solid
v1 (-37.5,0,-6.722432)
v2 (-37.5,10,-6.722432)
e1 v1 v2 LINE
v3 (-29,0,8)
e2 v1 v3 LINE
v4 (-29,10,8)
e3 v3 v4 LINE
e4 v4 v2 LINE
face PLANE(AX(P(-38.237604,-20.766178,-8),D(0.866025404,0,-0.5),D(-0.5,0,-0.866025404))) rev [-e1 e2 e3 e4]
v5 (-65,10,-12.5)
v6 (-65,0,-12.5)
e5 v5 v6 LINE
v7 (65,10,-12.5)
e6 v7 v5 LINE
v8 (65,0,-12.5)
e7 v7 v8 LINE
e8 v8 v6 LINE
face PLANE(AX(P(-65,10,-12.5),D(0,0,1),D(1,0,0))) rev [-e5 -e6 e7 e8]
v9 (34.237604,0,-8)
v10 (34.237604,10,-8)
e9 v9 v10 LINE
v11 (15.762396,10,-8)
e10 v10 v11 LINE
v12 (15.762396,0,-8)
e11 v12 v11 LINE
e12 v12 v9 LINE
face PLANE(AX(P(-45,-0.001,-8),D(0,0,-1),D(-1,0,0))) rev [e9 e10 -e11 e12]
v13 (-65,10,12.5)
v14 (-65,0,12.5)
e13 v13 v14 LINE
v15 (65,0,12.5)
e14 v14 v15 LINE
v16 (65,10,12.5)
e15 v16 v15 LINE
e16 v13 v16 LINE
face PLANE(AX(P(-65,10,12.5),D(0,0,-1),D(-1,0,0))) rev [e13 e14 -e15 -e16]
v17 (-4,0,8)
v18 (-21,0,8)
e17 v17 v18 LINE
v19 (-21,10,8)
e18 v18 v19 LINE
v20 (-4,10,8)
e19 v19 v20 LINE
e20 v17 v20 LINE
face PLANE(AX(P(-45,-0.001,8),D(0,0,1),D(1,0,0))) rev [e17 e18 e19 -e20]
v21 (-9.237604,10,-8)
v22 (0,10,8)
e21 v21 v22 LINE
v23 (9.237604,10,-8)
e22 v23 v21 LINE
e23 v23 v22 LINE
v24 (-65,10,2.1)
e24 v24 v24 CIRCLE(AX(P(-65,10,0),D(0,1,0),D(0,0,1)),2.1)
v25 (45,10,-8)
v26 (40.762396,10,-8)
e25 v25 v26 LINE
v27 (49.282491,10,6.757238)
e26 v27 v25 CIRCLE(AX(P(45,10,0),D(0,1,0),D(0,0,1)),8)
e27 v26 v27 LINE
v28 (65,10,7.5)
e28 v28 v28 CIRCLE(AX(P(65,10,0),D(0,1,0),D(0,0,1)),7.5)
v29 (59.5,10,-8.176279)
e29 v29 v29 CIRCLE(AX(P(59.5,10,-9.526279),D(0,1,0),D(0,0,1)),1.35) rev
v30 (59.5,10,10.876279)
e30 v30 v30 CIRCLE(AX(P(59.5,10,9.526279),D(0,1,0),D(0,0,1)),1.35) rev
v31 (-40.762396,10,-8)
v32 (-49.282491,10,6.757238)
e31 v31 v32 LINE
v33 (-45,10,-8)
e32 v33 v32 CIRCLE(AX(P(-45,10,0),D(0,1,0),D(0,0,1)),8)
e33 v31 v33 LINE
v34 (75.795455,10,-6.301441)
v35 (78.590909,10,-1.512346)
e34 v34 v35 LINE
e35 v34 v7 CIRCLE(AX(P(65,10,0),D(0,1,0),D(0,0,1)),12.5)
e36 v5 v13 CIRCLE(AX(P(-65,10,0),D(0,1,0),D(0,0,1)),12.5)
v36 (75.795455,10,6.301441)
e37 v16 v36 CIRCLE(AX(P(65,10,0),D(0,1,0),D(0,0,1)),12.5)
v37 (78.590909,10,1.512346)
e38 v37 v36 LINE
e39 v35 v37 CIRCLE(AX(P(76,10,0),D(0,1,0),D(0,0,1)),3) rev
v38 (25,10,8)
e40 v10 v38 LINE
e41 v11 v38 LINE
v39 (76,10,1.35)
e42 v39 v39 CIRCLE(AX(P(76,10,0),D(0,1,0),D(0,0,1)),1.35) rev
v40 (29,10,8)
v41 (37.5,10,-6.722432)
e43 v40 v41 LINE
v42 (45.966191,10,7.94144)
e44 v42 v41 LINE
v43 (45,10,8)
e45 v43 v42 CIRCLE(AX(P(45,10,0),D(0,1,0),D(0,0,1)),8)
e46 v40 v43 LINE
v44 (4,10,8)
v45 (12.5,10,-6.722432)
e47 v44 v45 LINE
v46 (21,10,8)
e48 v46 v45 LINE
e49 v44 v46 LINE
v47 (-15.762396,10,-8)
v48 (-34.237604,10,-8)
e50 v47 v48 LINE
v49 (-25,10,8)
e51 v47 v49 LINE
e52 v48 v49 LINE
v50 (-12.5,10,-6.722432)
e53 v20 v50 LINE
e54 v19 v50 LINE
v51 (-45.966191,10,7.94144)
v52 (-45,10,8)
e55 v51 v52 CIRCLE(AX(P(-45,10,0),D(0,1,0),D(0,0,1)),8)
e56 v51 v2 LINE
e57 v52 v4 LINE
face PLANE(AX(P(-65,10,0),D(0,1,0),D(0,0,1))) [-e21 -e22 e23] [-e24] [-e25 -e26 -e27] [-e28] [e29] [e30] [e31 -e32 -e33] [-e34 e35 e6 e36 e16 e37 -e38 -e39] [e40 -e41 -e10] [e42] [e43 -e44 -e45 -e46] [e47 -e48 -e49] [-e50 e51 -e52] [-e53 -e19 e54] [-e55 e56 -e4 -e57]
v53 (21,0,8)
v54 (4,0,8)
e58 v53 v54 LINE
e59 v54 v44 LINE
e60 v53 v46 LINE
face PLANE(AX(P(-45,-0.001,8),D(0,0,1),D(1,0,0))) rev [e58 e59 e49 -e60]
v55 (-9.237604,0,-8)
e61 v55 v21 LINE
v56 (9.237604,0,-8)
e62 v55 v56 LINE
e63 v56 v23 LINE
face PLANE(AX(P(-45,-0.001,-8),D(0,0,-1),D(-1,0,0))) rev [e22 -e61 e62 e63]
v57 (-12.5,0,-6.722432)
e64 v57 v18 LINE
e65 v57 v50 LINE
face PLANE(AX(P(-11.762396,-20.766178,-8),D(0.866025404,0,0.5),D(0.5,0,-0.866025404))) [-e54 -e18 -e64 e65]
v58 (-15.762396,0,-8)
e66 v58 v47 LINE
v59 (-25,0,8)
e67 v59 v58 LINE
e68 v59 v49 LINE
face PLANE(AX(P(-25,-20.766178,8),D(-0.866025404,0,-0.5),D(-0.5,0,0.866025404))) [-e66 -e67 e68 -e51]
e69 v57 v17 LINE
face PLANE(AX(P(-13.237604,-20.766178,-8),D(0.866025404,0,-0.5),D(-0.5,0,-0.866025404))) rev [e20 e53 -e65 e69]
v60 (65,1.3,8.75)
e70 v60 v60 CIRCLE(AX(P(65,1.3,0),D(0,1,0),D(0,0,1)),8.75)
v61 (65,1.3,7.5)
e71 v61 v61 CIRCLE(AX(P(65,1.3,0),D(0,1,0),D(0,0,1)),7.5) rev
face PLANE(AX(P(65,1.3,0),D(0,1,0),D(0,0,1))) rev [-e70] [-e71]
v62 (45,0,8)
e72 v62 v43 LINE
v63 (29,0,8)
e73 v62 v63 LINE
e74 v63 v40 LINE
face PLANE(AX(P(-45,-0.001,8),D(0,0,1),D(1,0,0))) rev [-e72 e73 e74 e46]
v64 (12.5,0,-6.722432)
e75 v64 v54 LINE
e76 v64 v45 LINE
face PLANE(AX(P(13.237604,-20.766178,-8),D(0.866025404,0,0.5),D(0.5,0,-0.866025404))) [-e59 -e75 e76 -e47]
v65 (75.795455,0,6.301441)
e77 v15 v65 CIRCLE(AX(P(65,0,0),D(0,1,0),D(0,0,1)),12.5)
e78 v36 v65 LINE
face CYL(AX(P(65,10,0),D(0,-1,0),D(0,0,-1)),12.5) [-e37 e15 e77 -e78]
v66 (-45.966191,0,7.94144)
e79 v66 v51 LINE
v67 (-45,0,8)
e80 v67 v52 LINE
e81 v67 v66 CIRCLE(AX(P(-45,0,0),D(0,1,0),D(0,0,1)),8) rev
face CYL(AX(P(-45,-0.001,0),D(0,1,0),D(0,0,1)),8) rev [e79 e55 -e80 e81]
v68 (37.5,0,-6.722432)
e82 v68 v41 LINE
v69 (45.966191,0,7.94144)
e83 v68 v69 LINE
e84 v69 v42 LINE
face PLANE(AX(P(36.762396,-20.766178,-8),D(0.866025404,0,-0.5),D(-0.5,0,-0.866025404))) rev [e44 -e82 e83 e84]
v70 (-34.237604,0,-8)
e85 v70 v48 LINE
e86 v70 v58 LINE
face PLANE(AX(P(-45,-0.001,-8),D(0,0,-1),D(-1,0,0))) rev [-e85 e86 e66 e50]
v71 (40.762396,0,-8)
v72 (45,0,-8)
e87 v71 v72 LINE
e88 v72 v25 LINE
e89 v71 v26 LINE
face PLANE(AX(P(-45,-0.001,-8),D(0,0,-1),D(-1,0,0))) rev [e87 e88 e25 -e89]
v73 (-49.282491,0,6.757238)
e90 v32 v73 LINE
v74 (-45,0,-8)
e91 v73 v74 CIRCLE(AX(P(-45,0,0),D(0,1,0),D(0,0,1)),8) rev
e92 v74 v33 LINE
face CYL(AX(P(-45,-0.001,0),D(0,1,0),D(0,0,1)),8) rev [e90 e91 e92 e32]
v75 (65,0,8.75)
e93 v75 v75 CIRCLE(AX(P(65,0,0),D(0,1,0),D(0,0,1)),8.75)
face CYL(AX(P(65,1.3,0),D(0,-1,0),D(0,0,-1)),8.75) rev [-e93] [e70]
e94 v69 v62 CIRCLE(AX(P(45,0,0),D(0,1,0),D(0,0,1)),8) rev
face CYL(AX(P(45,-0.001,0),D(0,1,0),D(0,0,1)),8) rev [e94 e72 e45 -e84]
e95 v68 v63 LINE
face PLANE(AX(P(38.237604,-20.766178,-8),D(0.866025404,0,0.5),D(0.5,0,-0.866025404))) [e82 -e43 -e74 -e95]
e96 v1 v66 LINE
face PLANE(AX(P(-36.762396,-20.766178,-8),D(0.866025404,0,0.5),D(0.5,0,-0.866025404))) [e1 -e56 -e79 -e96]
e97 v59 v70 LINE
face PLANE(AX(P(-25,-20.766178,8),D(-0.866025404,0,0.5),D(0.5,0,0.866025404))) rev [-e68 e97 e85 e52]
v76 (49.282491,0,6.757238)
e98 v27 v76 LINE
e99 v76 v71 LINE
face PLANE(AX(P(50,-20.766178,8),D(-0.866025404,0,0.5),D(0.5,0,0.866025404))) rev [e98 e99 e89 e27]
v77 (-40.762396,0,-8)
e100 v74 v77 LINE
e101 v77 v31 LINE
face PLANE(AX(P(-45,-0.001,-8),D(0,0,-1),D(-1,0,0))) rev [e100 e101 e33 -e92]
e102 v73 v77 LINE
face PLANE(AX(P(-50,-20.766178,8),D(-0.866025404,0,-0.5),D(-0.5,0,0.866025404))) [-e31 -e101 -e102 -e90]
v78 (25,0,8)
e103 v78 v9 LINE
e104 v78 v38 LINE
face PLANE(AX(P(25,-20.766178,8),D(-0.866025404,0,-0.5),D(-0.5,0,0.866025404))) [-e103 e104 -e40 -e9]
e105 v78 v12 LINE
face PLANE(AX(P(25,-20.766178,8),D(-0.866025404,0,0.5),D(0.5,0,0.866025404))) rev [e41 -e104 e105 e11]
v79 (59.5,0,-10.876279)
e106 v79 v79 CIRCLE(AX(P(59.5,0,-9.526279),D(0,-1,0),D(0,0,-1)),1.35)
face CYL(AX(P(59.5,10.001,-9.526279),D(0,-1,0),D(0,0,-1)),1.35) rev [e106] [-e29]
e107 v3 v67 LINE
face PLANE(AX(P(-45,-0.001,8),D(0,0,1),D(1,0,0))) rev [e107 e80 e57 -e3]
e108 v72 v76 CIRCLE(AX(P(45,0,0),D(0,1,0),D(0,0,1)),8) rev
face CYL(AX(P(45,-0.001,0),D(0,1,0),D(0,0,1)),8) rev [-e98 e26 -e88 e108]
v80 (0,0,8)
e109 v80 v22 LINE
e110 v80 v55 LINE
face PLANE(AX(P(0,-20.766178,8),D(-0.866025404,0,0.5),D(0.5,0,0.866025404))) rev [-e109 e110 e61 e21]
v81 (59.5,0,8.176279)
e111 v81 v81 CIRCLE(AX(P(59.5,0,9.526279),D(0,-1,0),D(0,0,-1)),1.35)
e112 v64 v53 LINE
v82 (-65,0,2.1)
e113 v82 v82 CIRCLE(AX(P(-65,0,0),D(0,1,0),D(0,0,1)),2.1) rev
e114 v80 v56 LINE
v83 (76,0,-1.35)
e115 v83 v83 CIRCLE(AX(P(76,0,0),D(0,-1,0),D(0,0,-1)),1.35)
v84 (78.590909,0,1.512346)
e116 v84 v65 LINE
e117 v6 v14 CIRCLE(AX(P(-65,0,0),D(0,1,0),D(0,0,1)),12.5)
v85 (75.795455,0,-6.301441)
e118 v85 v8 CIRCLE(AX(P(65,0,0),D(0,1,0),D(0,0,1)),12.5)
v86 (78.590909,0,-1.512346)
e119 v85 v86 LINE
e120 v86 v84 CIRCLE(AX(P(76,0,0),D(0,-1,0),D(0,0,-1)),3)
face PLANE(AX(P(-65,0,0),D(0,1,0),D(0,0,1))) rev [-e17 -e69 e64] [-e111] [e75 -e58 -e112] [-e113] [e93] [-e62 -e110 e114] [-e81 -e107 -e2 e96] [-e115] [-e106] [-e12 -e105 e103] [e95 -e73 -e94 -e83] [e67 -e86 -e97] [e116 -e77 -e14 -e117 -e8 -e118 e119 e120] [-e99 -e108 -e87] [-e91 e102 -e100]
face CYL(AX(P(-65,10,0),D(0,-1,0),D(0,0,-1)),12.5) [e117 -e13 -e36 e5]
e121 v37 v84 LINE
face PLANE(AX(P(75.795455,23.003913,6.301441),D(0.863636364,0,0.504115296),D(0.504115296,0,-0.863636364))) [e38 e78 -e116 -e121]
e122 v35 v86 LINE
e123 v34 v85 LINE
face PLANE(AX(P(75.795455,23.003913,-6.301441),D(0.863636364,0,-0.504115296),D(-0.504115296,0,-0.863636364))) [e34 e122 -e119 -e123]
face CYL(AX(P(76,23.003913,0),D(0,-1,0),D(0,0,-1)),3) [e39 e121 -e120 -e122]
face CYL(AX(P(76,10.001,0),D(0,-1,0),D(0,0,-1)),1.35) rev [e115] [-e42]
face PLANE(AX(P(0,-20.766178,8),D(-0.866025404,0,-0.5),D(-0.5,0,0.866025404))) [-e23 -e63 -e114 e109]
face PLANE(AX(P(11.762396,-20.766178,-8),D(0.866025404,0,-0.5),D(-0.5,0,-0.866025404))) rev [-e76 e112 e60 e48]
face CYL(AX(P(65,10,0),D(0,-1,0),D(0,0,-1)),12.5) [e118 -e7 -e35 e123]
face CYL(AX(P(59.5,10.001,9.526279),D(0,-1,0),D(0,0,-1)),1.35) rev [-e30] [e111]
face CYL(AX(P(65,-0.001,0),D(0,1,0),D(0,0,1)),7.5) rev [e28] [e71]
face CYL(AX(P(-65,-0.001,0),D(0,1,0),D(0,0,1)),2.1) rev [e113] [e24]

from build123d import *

# Parameters (mm, degrees)
EXTRUDE_1_DEPTH        = 10
EXTRUDE_5_DEPTH        = 10
CUT_EXTRUDE_2_REACH    = 82.606
SKETCH_7_R             = 7.5
SKETCH_8_R             = 8.75
CUT_EXTRUDE_3_DEPTH    = 1.3
CUT_EXTRUDE_4_REACH    = 82.606
SKETCH_9_R             = 1.35
CUT_EXTRUDE_5_REACH    = 82.606
SKETCH_12_R            = 2.1
CUT_EXTRUDE_6_REACH    = 82.606
EXTRUDE_6_DEPTH        = 10
PATTERN_LINEAR_1_DEPTH = 10


# Read off the part's stored shape, not the designer's step: 阵列(线性)1
with BuildPart() as part:
    # 草图1 → 凸台-拉伸1 (new body)
    with BuildSketch(Plane(origin=(0, 0, 0), x_dir=(1, 0, 0), z_dir=(0, 1, 0))):
        with BuildLine():
            Line((-65, 12.5), (65, 12.5))
            ThreePointArc((65, 12.5), (77.5, 0), (65, -12.5))
            Line((65, -12.5), (-65, -12.5))
            ThreePointArc((-65, -12.5), (-77.5, 0), (-65, 12.5))
        make_face()
    extrude(amount=EXTRUDE_1_DEPTH)

    # 草图10 → 凸台-拉伸5 (add)
    with BuildSketch(Plane.XZ):
        with BuildLine():
            Line((75.795454545, -6.301441197), (78.590909091, -1.512345887))
            ThreePointArc((78.590909091, -1.512345887), (79, 0), (78.590909091, 1.512345887))
            Line((78.590909091, 1.512345887), (75.795454545, 6.301441197))
            Line((75.795454545, 6.301441197), (75.795454545, -6.301441197))
        make_face()
    extrude(amount=-EXTRUDE_5_DEPTH)

    # 草图7 → 切除-拉伸2 (cut, up to next)
    with BuildSketch(Plane(origin=(0, 10, 0), x_dir=(1, 0, 0), z_dir=(0, 1, 0)), mode=Mode.PRIVATE) as cut_extrude_2_sk1:
        with Locations(Location((65, 0, 0), (0, 0, 270))):
            Circle(SKETCH_7_R)
    cut_extrude_2_tool1 = extrude(cut_extrude_2_sk1.sketch, amount=-CUT_EXTRUDE_2_REACH, mode=Mode.PRIVATE) & part.part
    add(cut_extrude_2_tool1.solids().sort_by_distance((65, 10, 0))[0], mode=Mode.SUBTRACT)

    # 草图8 → 切除-拉伸3 (cut)
    with BuildSketch(Plane(origin=(0, 0, 0), x_dir=(1, 0, 0), z_dir=(0, 1, 0))):
        with Locations(Location((65, 0, 0), (0, 0, 270))):
            Circle(SKETCH_8_R)
    extrude(amount=CUT_EXTRUDE_3_DEPTH, mode=Mode.SUBTRACT)

    # 草图9 → 切除-拉伸4 (cut, up to next)
    with BuildSketch(Plane.XZ, mode=Mode.PRIVATE) as cut_extrude_4_sk1:
        with Locations(Location((59.5, 9.526279442, 0), (0, 0, 270))):
            Circle(SKETCH_9_R)
    cut_extrude_4_tool1 = extrude(cut_extrude_4_sk1.sketch, amount=-CUT_EXTRUDE_4_REACH, mode=Mode.PRIVATE) & part.part
    # 草图9 → 切除-拉伸4 (cut, up to next)
    with BuildSketch(Plane.XZ, mode=Mode.PRIVATE) as cut_extrude_4_sk2:
        with Locations(Location((76, 0, 0), (0, 0, 270))):
            Circle(SKETCH_9_R)
    cut_extrude_4_tool2 = extrude(cut_extrude_4_sk2.sketch, amount=-CUT_EXTRUDE_4_REACH, mode=Mode.PRIVATE) & part.part
    # 草图9 → 切除-拉伸4 (cut, up to next)
    with BuildSketch(Plane.XZ, mode=Mode.PRIVATE) as cut_extrude_4_sk3:
        with Locations(Location((59.5, -9.526279442, 0), (0, 0, 270))):
            Circle(SKETCH_9_R)
    cut_extrude_4_tool3 = extrude(cut_extrude_4_sk3.sketch, amount=-CUT_EXTRUDE_4_REACH, mode=Mode.PRIVATE) & part.part
    add(cut_extrude_4_tool1.solids().sort_by_distance((59.5, 0, 9.526279))[0], mode=Mode.SUBTRACT)
    add(cut_extrude_4_tool2.solids().sort_by_distance((76, 0, 0))[0], mode=Mode.SUBTRACT)
    add(cut_extrude_4_tool3.solids().sort_by_distance((59.5, 0, -9.526279))[0], mode=Mode.SUBTRACT)

    # 草图12 → 切除-拉伸5 (cut, up to next)
    with BuildSketch(Plane(origin=(0, 10, 0), x_dir=(1, 0, 0), z_dir=(0, 1, 0)), mode=Mode.PRIVATE) as cut_extrude_5_sk1:
        with Locations(Location((-65, 0, 0), (0, 0, 270))):
            Circle(SKETCH_12_R)
    cut_extrude_5_tool1 = extrude(cut_extrude_5_sk1.sketch, amount=-CUT_EXTRUDE_5_REACH, mode=Mode.PRIVATE) & part.part
    add(cut_extrude_5_tool1.solids().sort_by_distance((-65, 10, 0))[0], mode=Mode.SUBTRACT)

    # 草图13 → 切除-拉伸6 (cut, up to next)
    with BuildSketch(Plane(origin=(0, 10, 0), x_dir=(1, 0, 0), z_dir=(0, 1, 0)), mode=Mode.PRIVATE) as cut_extrude_6_sk1:
        with BuildLine():
            Line((-45, 8), (45, 8))
            ThreePointArc((45, 8), (53, 0), (45, -8))
            Line((45, -8), (-45, -8))
            ThreePointArc((-45, -8), (-53, 0), (-45, 8))
        make_face()
    cut_extrude_6_tool1 = extrude(cut_extrude_6_sk1.sketch, amount=-CUT_EXTRUDE_6_REACH, mode=Mode.PRIVATE) & part.part
    add(cut_extrude_6_tool1.solids().sort_by_distance((0, 10, 0))[0], mode=Mode.SUBTRACT)

    # 草图14 → 凸台-拉伸6 (add)
    with BuildSketch(Plane(origin=(0, 10, 0), x_dir=(1, 0, 0), z_dir=(0, 1, 0))):
        Polygon((0, -8), (9.237604307, 8), (13.237604307, 8), (4, -8), align=None)
    extrude_6 = extrude(amount=-EXTRUDE_6_DEPTH)

    # 阵列(线性)1 outline → 阵列(线性)1 (add)
    with BuildSketch(Plane(origin=(0, 0, 0), x_dir=(1, 0, 0), z_dir=(0, 1, 0))):
        Polygon((38.237604307, 8), (34.237604307, 8), (25, -8), (29, -8), align=None)
        Polygon((-11.762395693, 8), (-15.762395693, 8), (-25, -8), (-21, -8), align=None)
        with BuildLine():
            Line((-45.966190603, -7.941440406), (-36.762395693, 8))
            Line((-36.762395693, 8), (-40.762395693, 8))
            Line((-40.762395693, 8), (-49.282491188, -6.757238284))
            ThreePointArc((-49.282491188, -6.757238284), (-47.690306451, -7.534072683), (-45.966190603, -7.941440406))
        make_face()
    pattern_linear_1 = extrude(amount=PATTERN_LINEAR_1_DEPTH)

    # 镜向1: 凸台-拉伸6, 阵列(线性)1 across plane
    add(extrude_6.mirror(Plane(origin=(0, 0, 0), x_dir=(0, 0, 1), z_dir=(1, 0, 0))))
    add(pattern_linear_1.mirror(Plane(origin=(0, 0, 0), x_dir=(0, 0, 1), z_dir=(1, 0, 0))))


solid = part.part
